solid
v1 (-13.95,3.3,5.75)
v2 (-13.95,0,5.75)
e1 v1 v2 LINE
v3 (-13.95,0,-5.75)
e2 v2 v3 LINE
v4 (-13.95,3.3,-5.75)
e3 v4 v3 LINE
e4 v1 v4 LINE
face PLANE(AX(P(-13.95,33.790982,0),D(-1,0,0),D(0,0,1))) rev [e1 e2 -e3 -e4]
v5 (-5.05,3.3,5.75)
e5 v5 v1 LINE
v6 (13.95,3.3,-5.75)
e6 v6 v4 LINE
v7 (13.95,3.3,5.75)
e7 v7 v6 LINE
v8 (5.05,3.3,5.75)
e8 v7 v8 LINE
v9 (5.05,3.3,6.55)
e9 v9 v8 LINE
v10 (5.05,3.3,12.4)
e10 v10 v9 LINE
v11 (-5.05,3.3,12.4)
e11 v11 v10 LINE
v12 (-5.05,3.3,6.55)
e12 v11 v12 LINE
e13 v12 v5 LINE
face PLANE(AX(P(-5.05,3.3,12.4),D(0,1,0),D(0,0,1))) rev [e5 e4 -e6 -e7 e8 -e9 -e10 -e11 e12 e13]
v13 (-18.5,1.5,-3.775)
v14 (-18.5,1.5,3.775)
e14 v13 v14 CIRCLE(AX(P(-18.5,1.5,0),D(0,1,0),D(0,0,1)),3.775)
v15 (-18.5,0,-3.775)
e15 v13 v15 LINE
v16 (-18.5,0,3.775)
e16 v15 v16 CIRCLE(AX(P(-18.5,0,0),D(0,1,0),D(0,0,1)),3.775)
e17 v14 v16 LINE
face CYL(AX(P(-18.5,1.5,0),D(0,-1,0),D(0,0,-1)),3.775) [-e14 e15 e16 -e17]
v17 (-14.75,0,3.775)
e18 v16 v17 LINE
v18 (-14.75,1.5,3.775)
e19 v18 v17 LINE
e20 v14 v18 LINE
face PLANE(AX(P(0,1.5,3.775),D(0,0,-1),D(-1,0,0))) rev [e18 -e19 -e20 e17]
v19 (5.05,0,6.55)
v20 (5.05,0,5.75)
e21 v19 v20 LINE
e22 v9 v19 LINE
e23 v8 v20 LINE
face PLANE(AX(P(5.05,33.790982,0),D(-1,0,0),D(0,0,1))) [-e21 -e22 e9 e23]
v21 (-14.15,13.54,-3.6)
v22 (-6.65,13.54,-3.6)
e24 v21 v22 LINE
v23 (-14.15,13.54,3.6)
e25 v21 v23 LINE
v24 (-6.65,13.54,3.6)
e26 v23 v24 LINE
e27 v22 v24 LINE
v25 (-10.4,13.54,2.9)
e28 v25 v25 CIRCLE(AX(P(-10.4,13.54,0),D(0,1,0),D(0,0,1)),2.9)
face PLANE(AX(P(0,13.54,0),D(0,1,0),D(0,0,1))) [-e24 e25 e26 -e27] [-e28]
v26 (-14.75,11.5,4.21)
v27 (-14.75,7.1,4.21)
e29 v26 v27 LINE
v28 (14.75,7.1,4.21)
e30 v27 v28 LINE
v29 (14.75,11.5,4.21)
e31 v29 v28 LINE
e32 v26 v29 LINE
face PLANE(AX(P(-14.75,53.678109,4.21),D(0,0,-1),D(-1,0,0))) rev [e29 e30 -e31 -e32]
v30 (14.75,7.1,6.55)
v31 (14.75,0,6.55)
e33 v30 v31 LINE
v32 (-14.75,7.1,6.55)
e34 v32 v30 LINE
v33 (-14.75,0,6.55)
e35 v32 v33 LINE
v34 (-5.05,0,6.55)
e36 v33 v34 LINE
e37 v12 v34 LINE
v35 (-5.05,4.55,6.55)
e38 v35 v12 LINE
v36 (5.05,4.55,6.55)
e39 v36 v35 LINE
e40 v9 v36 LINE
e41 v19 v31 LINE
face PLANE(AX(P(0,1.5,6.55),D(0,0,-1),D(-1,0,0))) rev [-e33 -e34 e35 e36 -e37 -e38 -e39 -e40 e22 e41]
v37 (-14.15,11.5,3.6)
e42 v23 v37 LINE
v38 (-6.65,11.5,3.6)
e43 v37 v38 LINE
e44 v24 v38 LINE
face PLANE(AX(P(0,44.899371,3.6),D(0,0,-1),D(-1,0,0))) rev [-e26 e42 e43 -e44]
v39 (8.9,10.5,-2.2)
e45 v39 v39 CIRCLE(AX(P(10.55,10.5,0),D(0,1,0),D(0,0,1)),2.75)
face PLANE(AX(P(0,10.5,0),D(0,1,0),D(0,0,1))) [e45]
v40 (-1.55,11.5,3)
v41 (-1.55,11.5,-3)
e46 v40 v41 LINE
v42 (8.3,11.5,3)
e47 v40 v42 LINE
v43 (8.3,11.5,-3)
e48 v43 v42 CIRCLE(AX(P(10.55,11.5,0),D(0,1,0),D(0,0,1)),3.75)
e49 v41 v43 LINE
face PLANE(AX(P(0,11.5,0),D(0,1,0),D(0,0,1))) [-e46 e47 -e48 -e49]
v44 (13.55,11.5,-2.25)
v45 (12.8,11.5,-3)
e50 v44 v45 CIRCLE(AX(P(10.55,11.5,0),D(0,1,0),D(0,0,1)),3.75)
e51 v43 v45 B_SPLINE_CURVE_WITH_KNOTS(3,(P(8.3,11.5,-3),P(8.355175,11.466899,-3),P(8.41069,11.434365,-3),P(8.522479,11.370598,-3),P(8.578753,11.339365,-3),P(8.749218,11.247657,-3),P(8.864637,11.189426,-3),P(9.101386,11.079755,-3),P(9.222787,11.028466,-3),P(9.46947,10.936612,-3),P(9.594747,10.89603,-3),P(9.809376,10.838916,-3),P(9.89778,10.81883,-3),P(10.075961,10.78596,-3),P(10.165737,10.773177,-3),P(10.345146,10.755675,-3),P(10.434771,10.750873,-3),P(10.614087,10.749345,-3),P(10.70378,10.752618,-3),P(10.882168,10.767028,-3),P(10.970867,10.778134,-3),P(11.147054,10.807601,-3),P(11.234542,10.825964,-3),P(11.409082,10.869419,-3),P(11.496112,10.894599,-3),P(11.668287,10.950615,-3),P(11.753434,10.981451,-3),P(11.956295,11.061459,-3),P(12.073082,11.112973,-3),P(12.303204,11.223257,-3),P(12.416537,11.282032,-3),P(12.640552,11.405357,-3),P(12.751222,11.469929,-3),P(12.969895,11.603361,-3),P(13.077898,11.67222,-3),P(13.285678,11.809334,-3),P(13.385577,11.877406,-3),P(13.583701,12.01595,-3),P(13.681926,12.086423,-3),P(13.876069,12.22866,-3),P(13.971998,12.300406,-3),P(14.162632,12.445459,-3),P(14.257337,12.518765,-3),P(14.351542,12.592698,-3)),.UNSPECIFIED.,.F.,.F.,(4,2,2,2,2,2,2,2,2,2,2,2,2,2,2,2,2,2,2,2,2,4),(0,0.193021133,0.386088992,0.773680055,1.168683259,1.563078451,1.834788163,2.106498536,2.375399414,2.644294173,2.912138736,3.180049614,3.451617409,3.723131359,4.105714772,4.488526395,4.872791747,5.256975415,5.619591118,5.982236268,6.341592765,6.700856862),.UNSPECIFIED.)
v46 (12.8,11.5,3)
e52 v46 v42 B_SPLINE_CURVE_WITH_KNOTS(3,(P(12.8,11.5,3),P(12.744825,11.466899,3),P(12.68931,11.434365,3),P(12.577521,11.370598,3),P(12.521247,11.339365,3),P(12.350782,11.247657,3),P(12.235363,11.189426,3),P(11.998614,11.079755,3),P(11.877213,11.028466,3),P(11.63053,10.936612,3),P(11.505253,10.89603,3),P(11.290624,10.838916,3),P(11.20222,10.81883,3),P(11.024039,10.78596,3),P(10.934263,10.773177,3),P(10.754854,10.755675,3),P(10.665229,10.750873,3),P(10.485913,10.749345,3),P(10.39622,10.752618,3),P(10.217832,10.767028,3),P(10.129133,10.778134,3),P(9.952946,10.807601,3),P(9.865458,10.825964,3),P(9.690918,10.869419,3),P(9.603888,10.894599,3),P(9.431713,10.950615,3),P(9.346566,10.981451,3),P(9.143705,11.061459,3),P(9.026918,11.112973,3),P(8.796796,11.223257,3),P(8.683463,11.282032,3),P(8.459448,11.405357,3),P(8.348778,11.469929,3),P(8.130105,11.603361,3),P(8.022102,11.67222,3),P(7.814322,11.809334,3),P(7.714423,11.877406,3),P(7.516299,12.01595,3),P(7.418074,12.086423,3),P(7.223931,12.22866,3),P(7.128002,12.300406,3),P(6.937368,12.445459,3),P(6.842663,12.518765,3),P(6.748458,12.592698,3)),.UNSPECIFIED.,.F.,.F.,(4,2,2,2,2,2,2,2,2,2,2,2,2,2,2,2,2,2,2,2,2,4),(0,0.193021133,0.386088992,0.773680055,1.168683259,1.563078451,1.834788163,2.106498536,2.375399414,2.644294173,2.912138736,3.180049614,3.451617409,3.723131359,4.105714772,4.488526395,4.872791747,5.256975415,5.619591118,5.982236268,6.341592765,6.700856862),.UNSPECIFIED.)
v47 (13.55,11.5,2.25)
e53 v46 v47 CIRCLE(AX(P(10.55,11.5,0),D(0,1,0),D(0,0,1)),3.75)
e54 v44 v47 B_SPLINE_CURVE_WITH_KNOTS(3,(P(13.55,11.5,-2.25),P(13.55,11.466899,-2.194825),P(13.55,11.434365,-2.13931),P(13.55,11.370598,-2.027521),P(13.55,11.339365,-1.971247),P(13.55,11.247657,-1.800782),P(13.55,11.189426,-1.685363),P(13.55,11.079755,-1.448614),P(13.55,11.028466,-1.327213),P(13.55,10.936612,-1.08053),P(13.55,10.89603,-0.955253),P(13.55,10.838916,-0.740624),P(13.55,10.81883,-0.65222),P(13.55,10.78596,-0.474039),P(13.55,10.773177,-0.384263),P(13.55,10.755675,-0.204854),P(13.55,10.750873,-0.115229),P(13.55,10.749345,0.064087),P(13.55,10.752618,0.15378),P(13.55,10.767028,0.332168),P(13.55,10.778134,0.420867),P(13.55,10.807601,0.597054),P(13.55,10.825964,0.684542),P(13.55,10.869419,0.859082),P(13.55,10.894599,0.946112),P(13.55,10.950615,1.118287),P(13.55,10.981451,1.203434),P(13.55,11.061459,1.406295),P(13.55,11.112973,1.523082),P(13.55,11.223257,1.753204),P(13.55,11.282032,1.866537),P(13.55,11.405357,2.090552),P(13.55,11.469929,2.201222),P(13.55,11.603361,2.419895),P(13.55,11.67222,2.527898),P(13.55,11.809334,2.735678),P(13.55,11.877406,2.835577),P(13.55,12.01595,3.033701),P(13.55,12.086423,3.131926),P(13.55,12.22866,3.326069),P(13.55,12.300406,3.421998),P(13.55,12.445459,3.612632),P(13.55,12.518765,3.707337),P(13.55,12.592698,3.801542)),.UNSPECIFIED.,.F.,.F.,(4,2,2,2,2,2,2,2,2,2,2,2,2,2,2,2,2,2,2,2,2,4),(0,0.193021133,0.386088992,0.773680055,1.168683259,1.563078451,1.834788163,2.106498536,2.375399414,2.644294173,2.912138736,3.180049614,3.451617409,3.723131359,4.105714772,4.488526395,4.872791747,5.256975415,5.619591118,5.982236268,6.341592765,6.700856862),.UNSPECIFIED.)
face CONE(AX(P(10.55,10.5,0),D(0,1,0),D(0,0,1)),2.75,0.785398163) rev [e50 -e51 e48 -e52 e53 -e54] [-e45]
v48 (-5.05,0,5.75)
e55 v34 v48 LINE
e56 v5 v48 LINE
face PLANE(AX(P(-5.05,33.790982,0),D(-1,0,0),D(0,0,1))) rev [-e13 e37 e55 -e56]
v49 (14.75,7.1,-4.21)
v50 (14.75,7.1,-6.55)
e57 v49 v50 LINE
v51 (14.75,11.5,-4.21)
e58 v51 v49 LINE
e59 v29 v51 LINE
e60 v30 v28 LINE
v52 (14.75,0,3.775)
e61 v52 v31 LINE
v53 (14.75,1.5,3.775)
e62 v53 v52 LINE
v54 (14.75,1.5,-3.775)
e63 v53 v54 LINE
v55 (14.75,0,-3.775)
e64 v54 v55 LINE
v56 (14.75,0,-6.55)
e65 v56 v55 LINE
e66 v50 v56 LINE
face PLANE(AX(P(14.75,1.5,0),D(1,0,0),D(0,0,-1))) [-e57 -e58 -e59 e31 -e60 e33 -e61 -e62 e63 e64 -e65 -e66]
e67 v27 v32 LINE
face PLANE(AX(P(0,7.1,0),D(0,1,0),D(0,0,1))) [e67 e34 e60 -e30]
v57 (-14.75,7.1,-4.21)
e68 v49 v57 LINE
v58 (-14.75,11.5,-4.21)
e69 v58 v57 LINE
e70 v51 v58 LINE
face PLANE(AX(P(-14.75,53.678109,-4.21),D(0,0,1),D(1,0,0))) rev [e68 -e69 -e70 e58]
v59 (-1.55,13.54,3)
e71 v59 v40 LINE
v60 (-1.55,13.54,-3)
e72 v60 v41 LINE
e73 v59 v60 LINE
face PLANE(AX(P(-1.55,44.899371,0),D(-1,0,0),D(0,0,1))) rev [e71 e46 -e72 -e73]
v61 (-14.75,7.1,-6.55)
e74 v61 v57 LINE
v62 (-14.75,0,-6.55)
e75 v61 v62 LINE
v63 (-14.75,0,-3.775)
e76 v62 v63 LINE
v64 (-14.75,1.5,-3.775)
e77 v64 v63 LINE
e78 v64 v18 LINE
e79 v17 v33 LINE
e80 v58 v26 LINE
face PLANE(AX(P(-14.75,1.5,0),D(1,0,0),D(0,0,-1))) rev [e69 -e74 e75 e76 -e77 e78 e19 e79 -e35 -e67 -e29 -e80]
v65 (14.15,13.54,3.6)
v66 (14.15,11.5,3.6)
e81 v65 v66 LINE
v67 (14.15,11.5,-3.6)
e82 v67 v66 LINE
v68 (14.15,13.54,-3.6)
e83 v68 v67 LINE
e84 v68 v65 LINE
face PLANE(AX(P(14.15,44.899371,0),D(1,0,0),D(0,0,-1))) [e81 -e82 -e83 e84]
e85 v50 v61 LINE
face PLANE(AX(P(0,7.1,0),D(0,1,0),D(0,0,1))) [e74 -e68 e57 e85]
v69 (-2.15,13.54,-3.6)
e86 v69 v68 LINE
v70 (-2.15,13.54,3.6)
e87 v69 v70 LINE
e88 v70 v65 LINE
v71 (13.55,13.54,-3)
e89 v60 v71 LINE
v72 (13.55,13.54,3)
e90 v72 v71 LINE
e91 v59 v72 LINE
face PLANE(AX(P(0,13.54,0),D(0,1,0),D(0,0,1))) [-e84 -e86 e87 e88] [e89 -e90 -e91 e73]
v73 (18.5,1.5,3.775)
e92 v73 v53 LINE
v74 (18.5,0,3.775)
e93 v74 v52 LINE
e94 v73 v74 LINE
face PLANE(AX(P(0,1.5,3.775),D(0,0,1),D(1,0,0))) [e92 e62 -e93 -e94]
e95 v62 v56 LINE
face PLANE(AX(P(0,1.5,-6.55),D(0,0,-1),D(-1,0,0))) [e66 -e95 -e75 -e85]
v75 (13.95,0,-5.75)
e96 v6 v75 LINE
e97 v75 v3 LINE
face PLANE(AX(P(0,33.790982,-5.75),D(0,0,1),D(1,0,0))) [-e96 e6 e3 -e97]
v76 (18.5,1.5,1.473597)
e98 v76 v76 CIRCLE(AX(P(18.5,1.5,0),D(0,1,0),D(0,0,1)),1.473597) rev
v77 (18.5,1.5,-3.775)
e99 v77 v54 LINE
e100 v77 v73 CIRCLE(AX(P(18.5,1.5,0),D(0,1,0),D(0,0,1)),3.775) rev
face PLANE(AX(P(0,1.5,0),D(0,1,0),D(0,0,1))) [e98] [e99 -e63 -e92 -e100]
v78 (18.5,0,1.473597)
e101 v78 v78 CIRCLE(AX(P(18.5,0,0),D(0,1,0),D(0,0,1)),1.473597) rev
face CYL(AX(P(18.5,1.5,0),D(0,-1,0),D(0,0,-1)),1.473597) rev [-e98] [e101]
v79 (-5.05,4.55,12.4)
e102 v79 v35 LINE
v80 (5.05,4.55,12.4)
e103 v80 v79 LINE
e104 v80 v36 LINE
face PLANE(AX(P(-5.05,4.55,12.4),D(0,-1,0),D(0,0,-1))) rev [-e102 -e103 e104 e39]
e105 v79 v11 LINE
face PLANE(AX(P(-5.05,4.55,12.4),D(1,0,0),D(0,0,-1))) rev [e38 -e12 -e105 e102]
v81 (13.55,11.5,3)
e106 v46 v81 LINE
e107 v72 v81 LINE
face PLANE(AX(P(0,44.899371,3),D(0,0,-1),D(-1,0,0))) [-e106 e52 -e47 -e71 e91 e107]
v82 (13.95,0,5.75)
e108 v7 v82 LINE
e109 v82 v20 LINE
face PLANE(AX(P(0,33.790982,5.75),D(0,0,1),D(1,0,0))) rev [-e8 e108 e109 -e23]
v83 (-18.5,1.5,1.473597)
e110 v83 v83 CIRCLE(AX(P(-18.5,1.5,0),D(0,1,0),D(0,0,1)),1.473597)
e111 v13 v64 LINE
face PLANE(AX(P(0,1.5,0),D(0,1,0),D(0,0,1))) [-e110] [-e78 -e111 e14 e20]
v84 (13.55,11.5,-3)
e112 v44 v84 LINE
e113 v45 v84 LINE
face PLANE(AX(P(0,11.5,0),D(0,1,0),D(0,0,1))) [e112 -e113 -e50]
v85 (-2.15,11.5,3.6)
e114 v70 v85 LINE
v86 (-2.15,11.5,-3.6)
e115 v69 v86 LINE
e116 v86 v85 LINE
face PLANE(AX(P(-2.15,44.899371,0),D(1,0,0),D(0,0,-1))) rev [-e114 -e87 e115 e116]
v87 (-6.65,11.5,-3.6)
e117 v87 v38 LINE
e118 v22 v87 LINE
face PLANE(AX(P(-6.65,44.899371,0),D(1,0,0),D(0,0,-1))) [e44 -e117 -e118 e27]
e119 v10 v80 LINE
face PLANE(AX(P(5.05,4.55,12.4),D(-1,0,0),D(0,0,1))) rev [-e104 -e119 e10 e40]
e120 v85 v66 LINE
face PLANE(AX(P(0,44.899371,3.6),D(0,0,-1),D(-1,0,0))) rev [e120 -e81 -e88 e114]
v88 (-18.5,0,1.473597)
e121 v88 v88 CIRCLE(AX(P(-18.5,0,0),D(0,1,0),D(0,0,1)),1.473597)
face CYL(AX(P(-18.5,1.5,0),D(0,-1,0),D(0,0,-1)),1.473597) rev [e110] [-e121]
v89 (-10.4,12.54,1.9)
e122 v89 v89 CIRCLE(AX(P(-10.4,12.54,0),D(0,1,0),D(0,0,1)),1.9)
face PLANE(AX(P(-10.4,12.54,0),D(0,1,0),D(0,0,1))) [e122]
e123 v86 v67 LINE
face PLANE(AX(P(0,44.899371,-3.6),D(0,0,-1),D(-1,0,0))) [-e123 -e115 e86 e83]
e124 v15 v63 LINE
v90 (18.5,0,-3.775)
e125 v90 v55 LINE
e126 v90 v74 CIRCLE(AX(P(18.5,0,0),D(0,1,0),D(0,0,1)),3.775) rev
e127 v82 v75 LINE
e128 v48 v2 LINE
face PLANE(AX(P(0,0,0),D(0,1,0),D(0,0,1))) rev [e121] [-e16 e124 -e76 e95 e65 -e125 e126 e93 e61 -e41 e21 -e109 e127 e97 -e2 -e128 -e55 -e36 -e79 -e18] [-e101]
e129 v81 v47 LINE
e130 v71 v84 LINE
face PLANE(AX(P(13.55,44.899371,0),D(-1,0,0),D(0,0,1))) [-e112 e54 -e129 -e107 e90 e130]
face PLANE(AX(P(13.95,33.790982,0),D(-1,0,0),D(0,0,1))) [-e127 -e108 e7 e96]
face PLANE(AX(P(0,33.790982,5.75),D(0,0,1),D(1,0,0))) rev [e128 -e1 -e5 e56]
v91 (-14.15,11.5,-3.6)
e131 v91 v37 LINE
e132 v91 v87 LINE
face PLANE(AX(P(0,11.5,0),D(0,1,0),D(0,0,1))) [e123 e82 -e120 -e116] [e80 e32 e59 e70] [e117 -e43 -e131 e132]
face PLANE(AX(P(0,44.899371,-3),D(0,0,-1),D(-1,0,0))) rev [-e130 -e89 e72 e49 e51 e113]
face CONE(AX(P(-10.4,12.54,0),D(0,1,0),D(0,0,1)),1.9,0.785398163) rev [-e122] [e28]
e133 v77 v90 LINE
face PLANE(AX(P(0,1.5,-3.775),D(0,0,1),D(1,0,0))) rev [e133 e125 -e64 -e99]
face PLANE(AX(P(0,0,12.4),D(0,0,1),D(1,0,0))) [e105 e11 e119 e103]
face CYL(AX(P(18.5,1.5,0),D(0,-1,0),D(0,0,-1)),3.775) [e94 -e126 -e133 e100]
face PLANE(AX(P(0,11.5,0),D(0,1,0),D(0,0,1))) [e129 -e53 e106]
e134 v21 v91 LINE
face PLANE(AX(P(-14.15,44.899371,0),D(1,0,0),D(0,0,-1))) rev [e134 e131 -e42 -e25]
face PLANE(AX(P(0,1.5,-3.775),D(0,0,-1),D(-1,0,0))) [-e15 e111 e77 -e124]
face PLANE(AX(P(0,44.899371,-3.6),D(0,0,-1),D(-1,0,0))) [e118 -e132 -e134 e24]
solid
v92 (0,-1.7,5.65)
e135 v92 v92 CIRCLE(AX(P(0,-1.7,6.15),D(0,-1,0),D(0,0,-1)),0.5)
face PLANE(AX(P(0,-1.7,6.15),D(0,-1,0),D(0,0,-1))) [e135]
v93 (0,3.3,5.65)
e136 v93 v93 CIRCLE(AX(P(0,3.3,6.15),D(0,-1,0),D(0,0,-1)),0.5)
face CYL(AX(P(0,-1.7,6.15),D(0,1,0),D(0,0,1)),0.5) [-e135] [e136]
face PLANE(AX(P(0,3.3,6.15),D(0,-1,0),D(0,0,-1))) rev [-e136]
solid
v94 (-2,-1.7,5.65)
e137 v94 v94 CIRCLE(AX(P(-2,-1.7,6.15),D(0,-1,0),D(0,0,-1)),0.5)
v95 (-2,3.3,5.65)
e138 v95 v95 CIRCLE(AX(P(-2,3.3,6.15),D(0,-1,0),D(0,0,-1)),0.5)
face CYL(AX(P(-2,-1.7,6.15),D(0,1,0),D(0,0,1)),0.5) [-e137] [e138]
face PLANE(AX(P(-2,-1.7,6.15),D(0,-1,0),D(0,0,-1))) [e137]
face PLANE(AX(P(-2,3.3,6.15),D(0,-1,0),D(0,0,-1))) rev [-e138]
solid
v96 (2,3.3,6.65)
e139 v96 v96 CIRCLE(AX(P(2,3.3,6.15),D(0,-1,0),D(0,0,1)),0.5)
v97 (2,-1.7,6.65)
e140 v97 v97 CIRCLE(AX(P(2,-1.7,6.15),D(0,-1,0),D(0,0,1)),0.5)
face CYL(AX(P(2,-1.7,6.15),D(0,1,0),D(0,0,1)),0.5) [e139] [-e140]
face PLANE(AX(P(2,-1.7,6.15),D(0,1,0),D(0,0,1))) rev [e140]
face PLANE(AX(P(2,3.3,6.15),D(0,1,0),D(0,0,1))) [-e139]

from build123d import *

# Parameters (mm, degrees)
SKETCH1_R             = 1.473596517
BOSS_EXTRUDE1_DEPTH   = 1.5
SKETCH2_W             = 29.5
SKETCH2_H             = 13.1
BOSS_EXTRUDE2_DEPTH   = 5.6
SKETCH3_W             = 29.5
SKETCH3_H             = 8.42
BOSS_EXTRUDE3_DEPTH   = 4.4
SKETCH4_W             = 7.5
SKETCH4_H             = 7.2
SKETCH4_W_2           = 16.3
SKETCH4_W_3           = 15.1
SKETCH4_H_2           = 6
BOSS_EXTRUDE4_DEPTH   = 2.04
SKETCH5_R             = 2.9
CUT_EXTRUDE1_DEPTH    = 1
CUT_EXTRUDE2_DEPTH    = 1
CHAMFER1_SIZE         = 1
SKETCH7_W             = 10.1
SKETCH7_H             = 1.25
BOSS_EXTRUDE5_DEPTH   = 5.85
SKETCH8_W             = 27.9
SKETCH8_H             = 11.5
SKETCH8_W_2           = 10.1
SKETCH8_H_2           = 0.8
CUT_EXTRUDE3_DEPTH    = 3.3
SKETCH9_R             = 0.5
BOSS_EXTRUDE6_DEPTH   = 5
BOSS_EXTRUDE6_2_DEPTH = 5
BOSS_EXTRUDE6_3_DEPTH = 5


with BuildPart() as part:
    # Sketch1 → Boss-Extrude1 (new body)
    with BuildSketch(Plane(origin=(0, 0, 0), x_dir=(1, 0, 0), z_dir=(0, 1, 0))):
        with BuildLine():
            Line((14.75, -6.55), (14.75, -3.775))
            Line((14.75, -3.775), (18.5, -3.775))
            ThreePointArc((18.5, -3.775), (22.275, 0), (18.5, 3.775))
            Line((18.5, 3.775), (14.75, 3.775))
            Line((14.75, 3.775), (14.75, 6.55))
            Line((14.75, 6.55), (-14.75, 6.55))
            Line((-14.75, 6.55), (-14.75, 3.775))
            Line((-14.75, 3.775), (-18.5, 3.775))
            ThreePointArc((-18.5, 3.775), (-22.275, 0), (-18.5, -3.775))
            Line((-18.5, -3.775), (-14.75, -3.775))
            Line((-14.75, -3.775), (-14.75, -6.55))
            Line((-14.75, -6.55), (14.75, -6.55))
        make_face()
        with Locations(Location((-18.5, 0, 0), (0, 0, 270))):
            Circle(SKETCH1_R, mode=Mode.SUBTRACT)
        with Locations(Location((18.5, 0, 0), (0, 0, 270))):
            Circle(SKETCH1_R, mode=Mode.SUBTRACT)
    extrude(amount=BOSS_EXTRUDE1_DEPTH)

    # Sketch2 → Boss-Extrude2 (add)
    with BuildSketch(Plane(origin=(0, 1.5, 0), x_dir=(1, 0, 0), z_dir=(0, 1, 0))):
        Rectangle(SKETCH2_W, SKETCH2_H)
    extrude(amount=BOSS_EXTRUDE2_DEPTH)

    # Sketch3 → Boss-Extrude3 (add)
    with BuildSketch(Plane(origin=(0, 7.1, 0), x_dir=(1, 0, 0), z_dir=(0, 1, 0))):
        Rectangle(SKETCH3_W, SKETCH3_H)
    extrude(amount=BOSS_EXTRUDE3_DEPTH)

    # Sketch4 → Boss-Extrude4 (add)
    # profile 1 of 2: a face of its own
    with BuildSketch(Plane(origin=(0, 11.5, 0), x_dir=(1, 0, 0), z_dir=(0, 1, 0))):
        with Locations((-10.4, 0)):
            Rectangle(SKETCH4_W, SKETCH4_H)
    # profile 2 of 2: a face of its own
    with BuildSketch(Plane(origin=(0, 11.5, 0), x_dir=(1, 0, 0), z_dir=(0, 1, 0))):
        with Locations((6, 0)):
            Rectangle(SKETCH4_W_2, SKETCH4_H)
        with Locations((6, 0)):
            Rectangle(SKETCH4_W_3, SKETCH4_H_2, mode=Mode.SUBTRACT)
    extrude(amount=BOSS_EXTRUDE4_DEPTH)

    # Sketch5 → Cut-Extrude1 (cut)
    with BuildSketch(Plane(origin=(0, 13.54, 0), x_dir=(1, 0, 0), z_dir=(0, 1, 0))):
        with Locations(Location((-10.4, 0, 0), (0, 0, 270))):
            Circle(SKETCH5_R)
    extrude(amount=-CUT_EXTRUDE1_DEPTH, mode=Mode.SUBTRACT)

    # Sketch6 → Cut-Extrude2 (cut)
    with BuildSketch(Plane(origin=(0, 11.5, 0), x_dir=(1, 0, 0), z_dir=(0, 1, 0))):
        with BuildLine():
            ThreePointArc((8.3, 3), (7.195898034, 1.677050983), (6.8, 0))
            Line((6.8, 0), (13.55, 0))
            Line((13.55, 0), (13.55, 2.25))
            ThreePointArc((13.55, 2.25), (13.201650429, 2.651650429), (12.8, 3))
            Line((12.8, 3), (8.3, 3))
        make_face()
        with BuildLine():
            Line((13.55, 0), (6.8, 0))
            ThreePointArc((6.8, 0), (7.195898034, -1.677050983), (8.3, -3))
            Line((8.3, -3), (12.8, -3))
            ThreePointArc((12.8, -3), (13.201650429, -2.651650429), (13.55, -2.25))
            Line((13.55, -2.25), (13.55, 0))
        make_face()
    extrude(amount=-CUT_EXTRUDE2_DEPTH, mode=Mode.SUBTRACT)

    # Chamfer1
    # the kernel refuses this chamfer: 1 mm, written as the material it adds along each edge
    with BuildSketch(Plane(origin=(-10.4, 12.54, 0), x_dir=(0, 0, 1), z_dir=(-1, 0, 0))) as chamfer1_piece_1_section:
        Polygon((2.9, CHAMFER1_SIZE), (2.9 - CHAMFER1_SIZE, 0), (2.9, 0), align=None)
    chamfer1_piece_1 = revolve(axis=Axis((-10.4, 12.54, 0), (0, 1, 0)), mode=Mode.PRIVATE)
    chamfer1_piece_1 = split(chamfer1_piece_1, bisect_by=Plane(origin=(-10.4, 13.54, -2.40049425), z_dir=(0, -1, 0)), keep=Keep.TOP, mode=Mode.PRIVATE)
    add(chamfer1_piece_1)
    with BuildSketch(Plane(origin=(10.55, 10.5, 0), x_dir=(0.04265214044718796, 0, -0.9990899833925238), z_dir=(0.9990899833925238, 0, 0.04265214044718796))) as chamfer1_piece_2_section:
        Polygon((3.75 - CHAMFER1_SIZE, 0), (3.75, CHAMFER1_SIZE), (3.75, 0), align=None)
    chamfer1_piece_2 = revolve(axis=Axis((10.55, 10.5, 0), (0, 1, 0)), revolution_arc=184.889058401, mode=Mode.PRIVATE)
    chamfer1_piece_2 = split(chamfer1_piece_2, bisect_by=Plane(origin=(7.302801052, 11.5, 0), z_dir=(0, -1, 0)), keep=Keep.TOP, mode=Mode.PRIVATE)
    add(chamfer1_piece_2)
    with BuildSketch(Plane(origin=(10.55, 10.5, 0), x_dir=(0.999105910747441, 0, 0.04227740660833228), z_dir=(-0.04227740660833228, 0, 0.999105910747441))) as chamfer1_piece_3_section:
        Polygon((3.75, CHAMFER1_SIZE), (3.75 - CHAMFER1_SIZE, 0), (3.75, 0), align=None)
    chamfer1_piece_3 = revolve(axis=Axis((10.55, 10.5, 0), (0, 1, 0)), revolution_arc=94.846078296, mode=Mode.PRIVATE)
    chamfer1_piece_3 = split(chamfer1_piece_3, bisect_by=Plane(origin=(13.908005582, 11.5, -0.857414342), z_dir=(0, -1, 0)), keep=Keep.TOP, mode=Mode.PRIVATE)
    add(chamfer1_piece_3)
    with BuildSketch(Plane(origin=(10.55, 10.5, 0), x_dir=(-0.04227740660831898, 0, 0.9991059107474417), z_dir=(-0.9991059107474417, 0, -0.04227740660831898))) as chamfer1_piece_4_section:
        Polygon((3.75, CHAMFER1_SIZE), (3.75 - CHAMFER1_SIZE, 0), (3.75, 0), align=None)
    chamfer1_piece_4 = revolve(axis=Axis((10.55, 10.5, 0), (0, 1, 0)), revolution_arc=94.846078296, mode=Mode.PRIVATE)
    chamfer1_piece_4 = split(chamfer1_piece_4, bisect_by=Plane(origin=(11.407414343, 11.5, 3.358005582), z_dir=(0, -1, 0)), keep=Keep.TOP, mode=Mode.PRIVATE)
    add(chamfer1_piece_4)

    # Sketch7 → Boss-Extrude5 (add)
    with BuildSketch(Plane.XY.offset(6.55)):
        with Locations((0, 3.925)):
            Rectangle(SKETCH7_W, SKETCH7_H)
    extrude(amount=BOSS_EXTRUDE5_DEPTH)

    # Sketch8 → Cut-Extrude3 (cut)
    with BuildSketch(Plane.XZ):
        Rectangle(SKETCH8_W, SKETCH8_H)
        with Locations((0, 6.15)):
            Rectangle(SKETCH8_W_2, SKETCH8_H_2)
    extrude(amount=-CUT_EXTRUDE3_DEPTH, mode=Mode.SUBTRACT)


with BuildPart() as body_2:
    # Sketch9 → Boss-Extrude6 (new body)
    with BuildSketch(Plane.XZ.offset(-3.3)):
        with Locations(Location((0, 6.15, 0), (0, 0, 270))):
            Circle(SKETCH9_R)
    extrude(amount=BOSS_EXTRUDE6_DEPTH)


with BuildPart() as body_3:
    # Sketch9 → Boss-Extrude6 2 (new body)
    with BuildSketch(Plane.XZ.offset(-3.3)):
        with Locations(Location((-2, 6.15, 0), (0, 0, 270))):
            Circle(SKETCH9_R)
    extrude(amount=BOSS_EXTRUDE6_2_DEPTH)


with BuildPart() as body_4:
    # Sketch9 → Boss-Extrude6 3 (new body)
    with BuildSketch(Plane.XZ.offset(-3.3)):
        with Locations(Location((2, 6.15, 0), (0, 0, 90))):
            Circle(SKETCH9_R)
    extrude(amount=BOSS_EXTRUDE6_3_DEPTH)


solid = Compound([part.part, body_2.part, body_3.part, body_4.part])
